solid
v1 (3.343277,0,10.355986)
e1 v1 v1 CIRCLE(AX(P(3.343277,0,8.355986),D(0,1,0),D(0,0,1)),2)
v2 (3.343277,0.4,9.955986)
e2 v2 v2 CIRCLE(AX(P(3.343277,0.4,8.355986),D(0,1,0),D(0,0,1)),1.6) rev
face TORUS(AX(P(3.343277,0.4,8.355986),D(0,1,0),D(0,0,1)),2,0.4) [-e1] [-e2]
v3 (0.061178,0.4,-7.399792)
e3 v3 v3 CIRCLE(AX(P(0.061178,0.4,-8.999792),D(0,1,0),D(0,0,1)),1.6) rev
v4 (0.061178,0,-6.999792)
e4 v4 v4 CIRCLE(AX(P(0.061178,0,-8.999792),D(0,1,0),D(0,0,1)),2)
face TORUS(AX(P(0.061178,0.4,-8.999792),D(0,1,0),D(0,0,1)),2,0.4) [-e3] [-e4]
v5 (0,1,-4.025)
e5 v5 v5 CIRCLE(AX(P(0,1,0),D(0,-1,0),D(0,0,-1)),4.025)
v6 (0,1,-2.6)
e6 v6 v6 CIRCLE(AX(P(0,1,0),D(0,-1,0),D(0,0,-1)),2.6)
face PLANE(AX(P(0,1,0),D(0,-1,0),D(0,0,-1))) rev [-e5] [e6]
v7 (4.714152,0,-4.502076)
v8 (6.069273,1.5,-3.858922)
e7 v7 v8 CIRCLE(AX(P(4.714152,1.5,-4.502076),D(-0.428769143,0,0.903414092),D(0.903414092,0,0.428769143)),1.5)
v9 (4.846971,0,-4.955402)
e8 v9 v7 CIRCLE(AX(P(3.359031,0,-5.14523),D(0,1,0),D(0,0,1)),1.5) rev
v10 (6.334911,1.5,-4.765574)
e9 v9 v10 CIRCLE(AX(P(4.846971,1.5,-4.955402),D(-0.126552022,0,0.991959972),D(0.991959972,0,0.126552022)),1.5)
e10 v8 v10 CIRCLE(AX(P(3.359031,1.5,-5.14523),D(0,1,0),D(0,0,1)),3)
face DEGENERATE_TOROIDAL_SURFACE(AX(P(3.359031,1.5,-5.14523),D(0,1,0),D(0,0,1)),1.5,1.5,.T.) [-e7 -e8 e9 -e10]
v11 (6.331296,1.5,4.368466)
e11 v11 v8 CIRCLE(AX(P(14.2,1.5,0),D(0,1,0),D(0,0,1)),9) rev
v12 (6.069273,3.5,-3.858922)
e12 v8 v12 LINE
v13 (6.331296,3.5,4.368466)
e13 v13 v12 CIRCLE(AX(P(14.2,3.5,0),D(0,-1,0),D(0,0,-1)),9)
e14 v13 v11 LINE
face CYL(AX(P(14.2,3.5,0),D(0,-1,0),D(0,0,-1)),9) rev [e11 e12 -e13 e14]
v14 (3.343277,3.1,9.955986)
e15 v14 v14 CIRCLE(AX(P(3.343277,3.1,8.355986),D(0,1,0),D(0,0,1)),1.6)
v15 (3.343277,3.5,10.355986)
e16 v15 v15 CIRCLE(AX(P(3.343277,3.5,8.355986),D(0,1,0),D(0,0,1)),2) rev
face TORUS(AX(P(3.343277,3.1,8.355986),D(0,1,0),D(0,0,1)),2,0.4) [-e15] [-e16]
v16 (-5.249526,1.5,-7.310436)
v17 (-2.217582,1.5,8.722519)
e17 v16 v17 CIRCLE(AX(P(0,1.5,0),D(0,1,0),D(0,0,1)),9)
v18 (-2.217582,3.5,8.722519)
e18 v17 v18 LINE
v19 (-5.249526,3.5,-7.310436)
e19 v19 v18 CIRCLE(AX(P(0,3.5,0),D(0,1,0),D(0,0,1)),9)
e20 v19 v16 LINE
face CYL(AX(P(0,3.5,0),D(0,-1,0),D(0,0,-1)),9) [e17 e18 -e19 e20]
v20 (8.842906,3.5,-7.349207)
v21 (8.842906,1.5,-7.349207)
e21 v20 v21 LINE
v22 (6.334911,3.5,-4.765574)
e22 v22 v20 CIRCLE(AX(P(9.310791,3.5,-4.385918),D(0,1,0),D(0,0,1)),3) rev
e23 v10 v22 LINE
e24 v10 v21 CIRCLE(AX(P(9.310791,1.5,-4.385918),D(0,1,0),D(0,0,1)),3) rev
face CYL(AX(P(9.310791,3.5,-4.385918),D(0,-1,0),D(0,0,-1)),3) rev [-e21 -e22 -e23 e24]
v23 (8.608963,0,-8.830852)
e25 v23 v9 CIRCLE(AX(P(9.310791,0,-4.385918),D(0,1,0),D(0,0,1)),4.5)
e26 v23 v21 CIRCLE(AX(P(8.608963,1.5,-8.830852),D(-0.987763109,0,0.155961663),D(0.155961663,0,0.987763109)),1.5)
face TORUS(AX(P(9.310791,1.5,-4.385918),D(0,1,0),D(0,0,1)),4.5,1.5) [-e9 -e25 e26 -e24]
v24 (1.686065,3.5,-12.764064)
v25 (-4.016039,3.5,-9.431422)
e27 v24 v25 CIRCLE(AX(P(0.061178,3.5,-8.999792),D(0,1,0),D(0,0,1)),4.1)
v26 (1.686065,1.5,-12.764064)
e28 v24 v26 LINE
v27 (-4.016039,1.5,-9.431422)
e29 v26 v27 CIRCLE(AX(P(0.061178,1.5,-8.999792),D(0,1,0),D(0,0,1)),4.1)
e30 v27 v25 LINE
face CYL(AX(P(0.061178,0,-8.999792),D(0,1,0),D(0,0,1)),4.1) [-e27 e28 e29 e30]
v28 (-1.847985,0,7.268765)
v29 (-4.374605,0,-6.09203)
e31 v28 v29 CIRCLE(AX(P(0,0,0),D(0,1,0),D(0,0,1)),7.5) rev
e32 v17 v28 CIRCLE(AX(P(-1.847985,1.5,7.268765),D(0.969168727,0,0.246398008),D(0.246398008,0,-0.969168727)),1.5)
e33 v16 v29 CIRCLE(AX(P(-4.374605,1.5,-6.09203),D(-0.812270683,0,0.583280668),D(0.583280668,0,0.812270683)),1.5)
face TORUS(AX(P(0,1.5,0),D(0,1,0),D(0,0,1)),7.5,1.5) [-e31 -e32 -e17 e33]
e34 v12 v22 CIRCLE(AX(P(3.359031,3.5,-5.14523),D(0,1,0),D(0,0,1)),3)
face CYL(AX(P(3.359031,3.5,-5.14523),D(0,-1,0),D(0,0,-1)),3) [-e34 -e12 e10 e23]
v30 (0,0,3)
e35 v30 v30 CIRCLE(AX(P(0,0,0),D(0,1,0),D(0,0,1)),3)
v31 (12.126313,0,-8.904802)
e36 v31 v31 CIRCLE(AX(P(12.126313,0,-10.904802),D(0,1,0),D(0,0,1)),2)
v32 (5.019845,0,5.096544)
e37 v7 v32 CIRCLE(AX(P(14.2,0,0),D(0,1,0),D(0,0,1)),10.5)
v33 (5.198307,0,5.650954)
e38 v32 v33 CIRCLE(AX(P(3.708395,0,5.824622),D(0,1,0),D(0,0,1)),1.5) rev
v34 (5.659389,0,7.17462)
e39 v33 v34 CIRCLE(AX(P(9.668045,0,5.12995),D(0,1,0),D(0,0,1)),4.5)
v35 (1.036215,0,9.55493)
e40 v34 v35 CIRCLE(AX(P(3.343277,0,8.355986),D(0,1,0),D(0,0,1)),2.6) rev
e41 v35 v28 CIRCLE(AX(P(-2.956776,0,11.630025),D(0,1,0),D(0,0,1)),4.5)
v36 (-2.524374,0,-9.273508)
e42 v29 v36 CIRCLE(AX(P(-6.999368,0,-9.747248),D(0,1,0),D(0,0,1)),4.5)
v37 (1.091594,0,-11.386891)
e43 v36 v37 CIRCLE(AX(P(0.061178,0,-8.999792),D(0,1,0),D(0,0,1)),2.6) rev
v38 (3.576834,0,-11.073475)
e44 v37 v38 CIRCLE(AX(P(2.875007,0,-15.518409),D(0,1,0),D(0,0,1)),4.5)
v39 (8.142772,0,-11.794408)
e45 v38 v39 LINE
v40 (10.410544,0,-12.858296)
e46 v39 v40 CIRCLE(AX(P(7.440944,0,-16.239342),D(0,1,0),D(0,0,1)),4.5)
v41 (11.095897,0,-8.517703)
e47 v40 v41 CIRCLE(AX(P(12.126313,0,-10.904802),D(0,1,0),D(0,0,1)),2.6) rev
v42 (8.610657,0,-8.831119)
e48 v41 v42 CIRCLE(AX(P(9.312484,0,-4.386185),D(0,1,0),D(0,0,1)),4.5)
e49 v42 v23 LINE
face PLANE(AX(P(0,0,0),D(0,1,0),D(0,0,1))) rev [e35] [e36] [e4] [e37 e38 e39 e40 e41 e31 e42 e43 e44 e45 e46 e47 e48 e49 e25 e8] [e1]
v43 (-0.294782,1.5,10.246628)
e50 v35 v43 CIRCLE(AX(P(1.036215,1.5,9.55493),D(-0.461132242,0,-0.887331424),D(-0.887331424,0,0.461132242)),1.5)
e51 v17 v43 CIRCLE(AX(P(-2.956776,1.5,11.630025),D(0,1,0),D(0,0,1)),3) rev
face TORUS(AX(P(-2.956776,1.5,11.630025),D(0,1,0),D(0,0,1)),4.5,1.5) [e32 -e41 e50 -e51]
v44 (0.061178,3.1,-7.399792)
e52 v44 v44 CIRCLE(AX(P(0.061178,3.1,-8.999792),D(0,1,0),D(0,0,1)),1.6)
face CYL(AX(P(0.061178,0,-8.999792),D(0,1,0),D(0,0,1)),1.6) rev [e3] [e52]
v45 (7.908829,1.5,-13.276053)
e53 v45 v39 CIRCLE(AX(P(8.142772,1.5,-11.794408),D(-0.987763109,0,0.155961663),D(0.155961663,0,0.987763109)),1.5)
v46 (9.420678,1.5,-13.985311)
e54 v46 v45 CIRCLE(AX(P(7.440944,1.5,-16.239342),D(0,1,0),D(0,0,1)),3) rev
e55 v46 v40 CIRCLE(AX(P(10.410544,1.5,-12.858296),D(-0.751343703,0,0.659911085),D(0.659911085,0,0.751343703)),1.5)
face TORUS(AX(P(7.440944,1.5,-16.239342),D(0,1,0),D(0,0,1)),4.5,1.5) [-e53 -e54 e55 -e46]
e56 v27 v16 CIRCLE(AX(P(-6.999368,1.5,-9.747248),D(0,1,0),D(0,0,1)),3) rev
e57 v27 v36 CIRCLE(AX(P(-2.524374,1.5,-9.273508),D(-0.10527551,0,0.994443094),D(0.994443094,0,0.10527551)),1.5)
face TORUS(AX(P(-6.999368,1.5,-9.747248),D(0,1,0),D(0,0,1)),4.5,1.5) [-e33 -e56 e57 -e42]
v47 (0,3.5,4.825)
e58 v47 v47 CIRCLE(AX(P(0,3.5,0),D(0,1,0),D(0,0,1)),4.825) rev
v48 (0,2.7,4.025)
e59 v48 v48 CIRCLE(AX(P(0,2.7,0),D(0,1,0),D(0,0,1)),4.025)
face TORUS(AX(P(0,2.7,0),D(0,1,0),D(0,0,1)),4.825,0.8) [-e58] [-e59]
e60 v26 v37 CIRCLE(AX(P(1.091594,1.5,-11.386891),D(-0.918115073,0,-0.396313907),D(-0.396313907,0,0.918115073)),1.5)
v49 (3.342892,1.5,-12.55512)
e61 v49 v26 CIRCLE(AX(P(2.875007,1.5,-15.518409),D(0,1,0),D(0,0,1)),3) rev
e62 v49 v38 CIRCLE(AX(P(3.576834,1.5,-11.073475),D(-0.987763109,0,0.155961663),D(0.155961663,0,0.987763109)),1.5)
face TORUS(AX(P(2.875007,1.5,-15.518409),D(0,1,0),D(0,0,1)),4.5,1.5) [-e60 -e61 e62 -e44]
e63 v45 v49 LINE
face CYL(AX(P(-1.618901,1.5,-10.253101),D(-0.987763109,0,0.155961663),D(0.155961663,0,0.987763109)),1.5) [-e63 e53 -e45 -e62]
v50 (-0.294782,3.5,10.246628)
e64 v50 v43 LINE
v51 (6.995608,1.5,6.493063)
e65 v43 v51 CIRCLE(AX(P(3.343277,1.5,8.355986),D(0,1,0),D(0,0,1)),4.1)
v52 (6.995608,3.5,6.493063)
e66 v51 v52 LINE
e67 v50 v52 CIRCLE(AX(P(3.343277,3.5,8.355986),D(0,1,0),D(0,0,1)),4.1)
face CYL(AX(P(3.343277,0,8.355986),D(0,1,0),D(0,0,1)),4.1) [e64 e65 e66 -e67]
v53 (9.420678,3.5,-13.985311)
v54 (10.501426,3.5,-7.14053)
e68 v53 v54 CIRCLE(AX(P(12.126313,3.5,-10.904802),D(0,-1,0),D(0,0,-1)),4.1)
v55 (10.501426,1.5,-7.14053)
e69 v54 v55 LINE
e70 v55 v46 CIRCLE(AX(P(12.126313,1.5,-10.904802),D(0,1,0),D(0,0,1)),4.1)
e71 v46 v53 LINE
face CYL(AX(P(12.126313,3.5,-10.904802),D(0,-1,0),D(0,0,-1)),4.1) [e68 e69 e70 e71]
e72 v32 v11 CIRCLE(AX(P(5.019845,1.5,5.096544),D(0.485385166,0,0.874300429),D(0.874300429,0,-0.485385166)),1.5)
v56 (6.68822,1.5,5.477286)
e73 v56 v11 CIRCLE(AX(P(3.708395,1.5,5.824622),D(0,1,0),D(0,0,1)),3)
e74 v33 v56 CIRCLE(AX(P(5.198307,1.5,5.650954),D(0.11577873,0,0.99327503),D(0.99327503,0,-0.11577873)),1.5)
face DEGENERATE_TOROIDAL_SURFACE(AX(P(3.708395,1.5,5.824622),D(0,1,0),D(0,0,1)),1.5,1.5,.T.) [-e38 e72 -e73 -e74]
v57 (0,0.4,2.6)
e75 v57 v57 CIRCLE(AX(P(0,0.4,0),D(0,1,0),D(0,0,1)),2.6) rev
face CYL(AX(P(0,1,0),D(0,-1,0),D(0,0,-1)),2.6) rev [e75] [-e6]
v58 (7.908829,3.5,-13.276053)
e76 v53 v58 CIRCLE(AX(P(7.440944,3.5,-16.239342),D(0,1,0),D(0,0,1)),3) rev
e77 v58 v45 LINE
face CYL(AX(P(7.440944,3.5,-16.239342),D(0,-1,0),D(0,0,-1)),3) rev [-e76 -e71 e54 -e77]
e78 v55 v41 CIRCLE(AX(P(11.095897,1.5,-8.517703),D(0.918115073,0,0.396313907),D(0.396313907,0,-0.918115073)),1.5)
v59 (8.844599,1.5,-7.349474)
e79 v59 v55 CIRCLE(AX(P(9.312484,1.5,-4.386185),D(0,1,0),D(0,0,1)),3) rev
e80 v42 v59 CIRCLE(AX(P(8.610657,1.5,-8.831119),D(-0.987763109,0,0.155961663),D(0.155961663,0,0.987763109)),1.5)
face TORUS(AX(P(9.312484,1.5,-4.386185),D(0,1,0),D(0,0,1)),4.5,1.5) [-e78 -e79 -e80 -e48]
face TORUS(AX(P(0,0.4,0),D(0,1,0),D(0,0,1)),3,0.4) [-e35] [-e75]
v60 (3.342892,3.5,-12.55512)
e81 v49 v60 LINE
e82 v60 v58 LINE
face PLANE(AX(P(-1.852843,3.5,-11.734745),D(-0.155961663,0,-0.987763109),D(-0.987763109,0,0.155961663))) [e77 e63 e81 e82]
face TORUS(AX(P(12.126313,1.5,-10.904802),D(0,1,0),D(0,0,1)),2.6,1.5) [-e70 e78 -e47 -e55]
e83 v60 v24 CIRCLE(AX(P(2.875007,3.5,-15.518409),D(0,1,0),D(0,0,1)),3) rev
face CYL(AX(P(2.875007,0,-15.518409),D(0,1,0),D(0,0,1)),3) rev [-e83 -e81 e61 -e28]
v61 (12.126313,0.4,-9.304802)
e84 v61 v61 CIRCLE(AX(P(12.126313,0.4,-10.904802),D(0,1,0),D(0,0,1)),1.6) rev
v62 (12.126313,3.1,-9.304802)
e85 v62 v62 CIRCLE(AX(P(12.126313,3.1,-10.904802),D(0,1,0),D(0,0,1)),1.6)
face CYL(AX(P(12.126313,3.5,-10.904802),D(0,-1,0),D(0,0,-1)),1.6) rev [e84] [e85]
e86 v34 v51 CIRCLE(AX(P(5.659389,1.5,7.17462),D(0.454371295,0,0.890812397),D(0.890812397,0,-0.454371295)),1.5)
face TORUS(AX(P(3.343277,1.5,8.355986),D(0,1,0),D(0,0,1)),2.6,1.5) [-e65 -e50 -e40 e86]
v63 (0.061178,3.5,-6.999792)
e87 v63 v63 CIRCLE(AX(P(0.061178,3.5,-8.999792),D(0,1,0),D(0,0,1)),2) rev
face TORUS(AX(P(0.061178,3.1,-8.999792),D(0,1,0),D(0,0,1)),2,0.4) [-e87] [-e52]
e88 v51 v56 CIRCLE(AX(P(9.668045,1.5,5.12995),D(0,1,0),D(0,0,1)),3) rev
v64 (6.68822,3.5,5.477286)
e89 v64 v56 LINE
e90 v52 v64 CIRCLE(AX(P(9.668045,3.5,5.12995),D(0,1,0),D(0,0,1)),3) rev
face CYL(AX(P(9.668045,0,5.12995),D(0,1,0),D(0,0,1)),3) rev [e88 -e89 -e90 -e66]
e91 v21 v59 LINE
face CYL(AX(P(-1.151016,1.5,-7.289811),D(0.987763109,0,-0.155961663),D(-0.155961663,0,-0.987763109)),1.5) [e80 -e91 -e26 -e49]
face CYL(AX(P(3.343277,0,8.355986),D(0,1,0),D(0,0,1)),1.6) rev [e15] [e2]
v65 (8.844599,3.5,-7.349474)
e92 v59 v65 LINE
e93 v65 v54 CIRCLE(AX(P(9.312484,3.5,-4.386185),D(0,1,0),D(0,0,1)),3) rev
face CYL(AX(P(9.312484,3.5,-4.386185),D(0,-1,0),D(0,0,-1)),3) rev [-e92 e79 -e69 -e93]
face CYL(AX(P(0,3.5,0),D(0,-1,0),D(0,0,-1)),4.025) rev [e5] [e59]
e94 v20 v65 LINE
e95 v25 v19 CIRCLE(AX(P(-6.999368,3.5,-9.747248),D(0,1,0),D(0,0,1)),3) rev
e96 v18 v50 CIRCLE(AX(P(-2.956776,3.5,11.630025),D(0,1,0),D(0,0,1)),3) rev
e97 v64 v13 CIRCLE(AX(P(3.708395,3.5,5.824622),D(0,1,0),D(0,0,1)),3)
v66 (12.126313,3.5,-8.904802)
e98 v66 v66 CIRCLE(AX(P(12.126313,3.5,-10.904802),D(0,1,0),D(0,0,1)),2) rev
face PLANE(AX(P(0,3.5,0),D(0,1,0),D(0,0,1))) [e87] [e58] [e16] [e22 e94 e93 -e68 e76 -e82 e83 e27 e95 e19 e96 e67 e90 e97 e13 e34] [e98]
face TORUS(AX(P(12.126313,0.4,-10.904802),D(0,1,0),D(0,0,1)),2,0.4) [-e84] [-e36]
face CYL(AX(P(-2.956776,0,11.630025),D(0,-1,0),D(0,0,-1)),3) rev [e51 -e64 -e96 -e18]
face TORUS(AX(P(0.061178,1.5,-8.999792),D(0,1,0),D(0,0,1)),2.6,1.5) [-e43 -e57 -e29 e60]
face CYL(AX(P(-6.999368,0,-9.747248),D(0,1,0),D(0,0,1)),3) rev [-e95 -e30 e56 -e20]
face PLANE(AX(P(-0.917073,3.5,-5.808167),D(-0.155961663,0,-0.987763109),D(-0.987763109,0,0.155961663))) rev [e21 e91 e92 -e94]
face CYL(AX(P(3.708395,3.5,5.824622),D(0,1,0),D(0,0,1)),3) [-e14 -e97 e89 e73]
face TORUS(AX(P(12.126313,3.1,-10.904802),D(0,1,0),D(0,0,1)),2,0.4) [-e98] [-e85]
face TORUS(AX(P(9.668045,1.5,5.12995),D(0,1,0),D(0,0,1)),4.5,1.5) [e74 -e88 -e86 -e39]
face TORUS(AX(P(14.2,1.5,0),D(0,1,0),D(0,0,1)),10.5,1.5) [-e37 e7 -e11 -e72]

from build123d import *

# Parameters (mm, degrees)
SKETCH1_R           = 9
SKETCH1_R_2         = 4.025
BOSS_EXTRUDE1_DEPTH = 3.5
SKETCH2_R           = 4.1
SKETCH2_R_2         = 1.6
BOSS_EXTRUDE2_DEPTH = 3.5
SKETCH6_R           = 9
CUT_EXTRUDE2_DEPTH  = 17.27435259
CUT_EXTRUDE1_START  = -3.5
SKETCH3_R           = 1.6
CUT_EXTRUDE1_DEPTH  = 3.5
SKETCH4_R           = 1.6
BOSS_EXTRUDE3_DEPTH = 3.5
SKETCH5_R           = 4.025
SKETCH5_R_2         = 2.6
BOSS_EXTRUDE4_DEPTH = 1
FILLET1_R           = 3
FILLET9_R           = 3
FILLET5_R           = 1.5
FILLET6_R           = 0.4
FILLET7_R           = 0.8
FILLET8_R           = 0.4


with BuildPart() as part:
    # Sketch1 → Boss-Extrude1 (new body)
    with BuildSketch(Plane(origin=(0, 0, 0), x_dir=(1, 0, 0), z_dir=(0, 1, 0))):
        with Locations(Location((0, 0, 0), (0, 0, 270))):
            Circle(SKETCH1_R)
        with Locations(Location((0, 0, 0), (0, 0, 270))):
            Circle(SKETCH1_R_2, mode=Mode.SUBTRACT)
    extrude(amount=BOSS_EXTRUDE1_DEPTH)

    # Sketch2 → Boss-Extrude2 (add)
    # profile 1 of 2: a face of its own
    with BuildSketch(Plane(origin=(0, 3.5, 0), x_dir=(1, 0, 0), z_dir=(0, 1, 0))):
        with Locations((3.343277014, -8.355985807)):
            Circle(SKETCH2_R)
        with Locations((3.343277014, -8.355985807)):
            Circle(SKETCH2_R_2, mode=Mode.SUBTRACT)
    # profile 2 of 2: a face of its own
    with BuildSketch(Plane(origin=(0, 3.5, 0), x_dir=(1, 0, 0), z_dir=(0, 1, 0))):
        with Locations((0.061177946, 8.999792068)):
            Circle(SKETCH2_R)
        with Locations((0.061177946, 8.999792068)):
            Circle(SKETCH2_R_2, mode=Mode.SUBTRACT)
    extrude(amount=-BOSS_EXTRUDE2_DEPTH)

    # Sketch6 → Cut-Extrude2 (cut, through all)
    with BuildSketch(Plane(origin=(0, 0, 0), x_dir=(-1, 0, 0), z_dir=(0, -1, 0))):
        with Locations((-14.2, 0)):
            Circle(SKETCH6_R)
    extrude(amount=-CUT_EXTRUDE2_DEPTH, mode=Mode.SUBTRACT)

    # Sketch3 → Cut-Extrude1 (cut)
    with BuildSketch(Plane(origin=(0, 0, 0), x_dir=(-1, 0, 0), z_dir=(0, -1, 0)).offset(CUT_EXTRUDE1_START)):
        with Locations(Location((-0.061177946, 8.999792068, 0), (0, 0, 270))):
            Circle(SKETCH3_R)
        with Locations(Location((-3.343277014, -8.355985807, 0), (0, 0, 270))):
            Circle(SKETCH3_R)
    extrude(amount=CUT_EXTRUDE1_DEPTH, mode=Mode.SUBTRACT)

    # Sketch4 → Boss-Extrude3 (add)
    with BuildSketch(Plane(origin=(0, 0, 0), x_dir=(-1, 0, 0), z_dir=(0, -1, 0))):
        with BuildLine():
            Line((-2.353733001, 12.398937743), (-8.897987933, 13.432234974))
            ThreePointArc((-8.897987933, 13.432234974), (-16.176141716, 11.544244815), (-9.833757914, 7.505656319))
            Line((-9.833757914, 7.505656319), (-5.813078926, 6.870816065))
            ThreePointArc((-5.813078926, 6.870816065), (-4.964487715, 7.506920922), (-4.04696144, 8.038787415))
            ThreePointArc((-4.04696144, 8.038787415), (-3.883103044, 10.484005175), (-2.353733001, 12.398937743))
        make_face()
        with Locations(Location((-12.126312969, 10.904801994, 0), (0, 0, 90))):
            Circle(SKETCH4_R, mode=Mode.SUBTRACT)
    extrude(amount=-BOSS_EXTRUDE3_DEPTH)

    # Sketch5 → Boss-Extrude4 (add)
    with BuildSketch(Plane(origin=(0, 0, 0), x_dir=(-1, 0, 0), z_dir=(0, -1, 0))):
        with Locations(Location((0, 0, 0), (0, 0, 90))):
            Circle(SKETCH5_R)
        with Locations(Location((0, 0, 0), (0, 0, 90))):
            Circle(SKETCH5_R_2, mode=Mode.SUBTRACT)
    extrude(amount=-BOSS_EXTRUDE4_DEPTH)

    # Fillet1
    # the kernel refuses this fillet: 3 mm, written as the material it adds along each edge
    with BuildSketch(Plane(origin=(-0.71019136, 3.5, 8.97193559), x_dir=(-0.9865858542334134, 0, -0.1632432302624714), z_dir=(0, -1, 0))) as fillet1_piece_1:
        with BuildLine():
            CenterArc((1.782533661, -2.98917289), FILLET1_R, 94.869271374, 48.27534012)
            ThreePointArc((-0.617922081, -1.189780705), (-0.260000299, -0.620318503), (0, 0))
            ThreePointArc((0, 0), (0.763942997, -0.03248133), (1.527885995, 0))
        make_face()
    extrude(amount=3.5)
    with BuildSketch(Plane(origin=(-3.93730186, 3.5, -8.093062095), x_dir=(-0.8588495215516518, 0, 0.5122279759350309), z_dir=(0, -1, 0))) as fillet1_piece_2:
        with BuildLine():
            CenterArc((1.782533661, 2.98917289), FILLET1_R, 216.855388506, 48.27534012)
            ThreePointArc((-0.617922081, 1.189780705), (-0.260000299, 0.620318503), (0, 0))
            ThreePointArc((0, 0), (0.763942997, 0.03248133), (1.527885995, 0))
        make_face()
    extrude(amount=3.5)
    with BuildSketch(Plane(origin=(8.897987933, 0, -13.432234974), x_dir=(-0.9877631090139599, 0, 0.15596166346598195), z_dir=(0, 1, 0))) as fillet1_piece_3:
        with BuildLine():
            CenterArc((1.001412857, -3), FILLET1_R, 90, 32.320518146)
            ThreePointArc((-0.602552177, -0.464788732), (-0.290469322, -0.24640426), (0, 0))
            Line((0, 0), (1.001412857, 0))
        make_face()
    extrude(amount=3.5)
    with BuildSketch(Plane(origin=(2.353733001, 0, -12.398937743), x_dir=(-0.8773738132879287, 0, -0.4798074527939294), z_dir=(0, 1, 0)), Plane(origin=(9.833757914, 0, -7.505656319), x_dir=(0.8773738132879222, 0, 0.47980745279394127), z_dir=(0, 1, 0))) as fillet1_piece_4:
        with BuildLine():
            CenterArc((1.039393717, -2.987053466), FILLET1_R, 95.324882893, 32.320518146)
            Line((-0.792924625, -0.611635715), (0, 0))
            ThreePointArc((0, 0), (0.380492343, -0.017693596), (0.760984685, 0))
        make_face()
    extrude(amount=3.5)
    # the kernel refuses this fillet: 3 mm, written as the material it takes off along each edge
    with BuildSketch(Plane(origin=(7.1, 6.983871428, 5.530822724), x_dir=(-0.6413091964506672, 0, 0.7672825519636162), z_dir=(0, -1, 0))) as fillet1_2_piece_1:
        with BuildLine():
            CenterArc((2.400494629, 2.413903277), FILLET1_R, 201.072777054, 32.502187501)
            ThreePointArc((-0.398878795, 1.335242797), (-0.173557144, 0.675353237), (0, 0))
            ThreePointArc((0, 0), (0.309591521, -0.005326404), (0.619183042, 0))
        make_face()
    extrude(amount=10.467742856, mode=Mode.SUBTRACT)
    with BuildSketch(Plane(origin=(7.1, 8.410224582, -5.530822724), x_dir=(-0.5247859915025788, 0, 0.8512341999254115), z_dir=(0, -1, 0))) as fillet1_2_piece_2:
        with BuildLine():
            CenterArc((2.291438138, 2.982087035), FILLET1_R, 203.232841743, 60.502793026)
            ThreePointArc((-0.465290008, 1.798680965), (-0.279182448, 0.88730199), (0, 0))
            ThreePointArc((0, 0), (0.982044916, 0.053738894), (1.964089833, 0))
        make_face()
    extrude(amount=13.320449164, mode=Mode.SUBTRACT)

    # Fillet9
    fillet9_edges = [part.edges().sort_by_distance(p)[0] for p in [
        (6.702912221, 1.75, 6.005911068),
        (5.813078926, 1.75, -6.870816065),
    ]]
    fillet(fillet9_edges, radius=FILLET9_R)

    # Fillet5
    fillet5_edges = [part.edges().sort_by_distance(p)[0] for p in [
        (16.176141716, 0, -11.544244815),
        (5.625860467, 0, -12.915586358),
        (-2.007663811, 0, -12.539551069),
        (5.204560758, 0, 0.286483569),
        (5.220072831, 0, 12.001206989),
        (-8.84326494, 0, 1.672323294),
        (6.564091926, 0, 4.905386326),
        (9.687844205, 0, -7.362609827),
        (8.715099113, 0, -13.523365587),
        (2.49964671, 0, -12.541984235),
        (-4.406035705, 0, -8.239061366),
        (-1.093245074, 0, 9.27901385),
        (8.843752485, 0, -7.349340608),
        (6.238006504, 0, -4.301725459),
        (7.158194759, 0, -6.475494242),
        (6.796639749, 0, 5.998875214),
    ]]
    fillet(fillet5_edges, radius=FILLET5_R)

    # Fillet6
    fillet6_edges = [part.edges().sort_by_distance(p)[0] for p in [
        (4.706817353, 0, 9.19309855),
        (1.13707684, 0, -7.815544808),
        (12.126312969, 0, -9.304801994),
        (0, 0, 2.6),
    ]]
    fillet(fillet6_edges, radius=FILLET6_R)

    # Fillet7
    fillet7_edges = [part.edges().sort_by_distance(p)[0] for p in [
        (0, 3.5, -4.025),
    ]]
    fillet(fillet7_edges, radius=FILLET7_R)

    # Fillet8
    fillet8_edges = [part.edges().sort_by_distance(p)[0] for p in [
        (4.706817353, 3.5, 9.19309855),
        (1.13707684, 3.5, -7.815544808),
        (12.126312969, 3.5, -9.304801994),
    ]]
    fillet(fillet8_edges, radius=FILLET8_R)


solid = part.part
